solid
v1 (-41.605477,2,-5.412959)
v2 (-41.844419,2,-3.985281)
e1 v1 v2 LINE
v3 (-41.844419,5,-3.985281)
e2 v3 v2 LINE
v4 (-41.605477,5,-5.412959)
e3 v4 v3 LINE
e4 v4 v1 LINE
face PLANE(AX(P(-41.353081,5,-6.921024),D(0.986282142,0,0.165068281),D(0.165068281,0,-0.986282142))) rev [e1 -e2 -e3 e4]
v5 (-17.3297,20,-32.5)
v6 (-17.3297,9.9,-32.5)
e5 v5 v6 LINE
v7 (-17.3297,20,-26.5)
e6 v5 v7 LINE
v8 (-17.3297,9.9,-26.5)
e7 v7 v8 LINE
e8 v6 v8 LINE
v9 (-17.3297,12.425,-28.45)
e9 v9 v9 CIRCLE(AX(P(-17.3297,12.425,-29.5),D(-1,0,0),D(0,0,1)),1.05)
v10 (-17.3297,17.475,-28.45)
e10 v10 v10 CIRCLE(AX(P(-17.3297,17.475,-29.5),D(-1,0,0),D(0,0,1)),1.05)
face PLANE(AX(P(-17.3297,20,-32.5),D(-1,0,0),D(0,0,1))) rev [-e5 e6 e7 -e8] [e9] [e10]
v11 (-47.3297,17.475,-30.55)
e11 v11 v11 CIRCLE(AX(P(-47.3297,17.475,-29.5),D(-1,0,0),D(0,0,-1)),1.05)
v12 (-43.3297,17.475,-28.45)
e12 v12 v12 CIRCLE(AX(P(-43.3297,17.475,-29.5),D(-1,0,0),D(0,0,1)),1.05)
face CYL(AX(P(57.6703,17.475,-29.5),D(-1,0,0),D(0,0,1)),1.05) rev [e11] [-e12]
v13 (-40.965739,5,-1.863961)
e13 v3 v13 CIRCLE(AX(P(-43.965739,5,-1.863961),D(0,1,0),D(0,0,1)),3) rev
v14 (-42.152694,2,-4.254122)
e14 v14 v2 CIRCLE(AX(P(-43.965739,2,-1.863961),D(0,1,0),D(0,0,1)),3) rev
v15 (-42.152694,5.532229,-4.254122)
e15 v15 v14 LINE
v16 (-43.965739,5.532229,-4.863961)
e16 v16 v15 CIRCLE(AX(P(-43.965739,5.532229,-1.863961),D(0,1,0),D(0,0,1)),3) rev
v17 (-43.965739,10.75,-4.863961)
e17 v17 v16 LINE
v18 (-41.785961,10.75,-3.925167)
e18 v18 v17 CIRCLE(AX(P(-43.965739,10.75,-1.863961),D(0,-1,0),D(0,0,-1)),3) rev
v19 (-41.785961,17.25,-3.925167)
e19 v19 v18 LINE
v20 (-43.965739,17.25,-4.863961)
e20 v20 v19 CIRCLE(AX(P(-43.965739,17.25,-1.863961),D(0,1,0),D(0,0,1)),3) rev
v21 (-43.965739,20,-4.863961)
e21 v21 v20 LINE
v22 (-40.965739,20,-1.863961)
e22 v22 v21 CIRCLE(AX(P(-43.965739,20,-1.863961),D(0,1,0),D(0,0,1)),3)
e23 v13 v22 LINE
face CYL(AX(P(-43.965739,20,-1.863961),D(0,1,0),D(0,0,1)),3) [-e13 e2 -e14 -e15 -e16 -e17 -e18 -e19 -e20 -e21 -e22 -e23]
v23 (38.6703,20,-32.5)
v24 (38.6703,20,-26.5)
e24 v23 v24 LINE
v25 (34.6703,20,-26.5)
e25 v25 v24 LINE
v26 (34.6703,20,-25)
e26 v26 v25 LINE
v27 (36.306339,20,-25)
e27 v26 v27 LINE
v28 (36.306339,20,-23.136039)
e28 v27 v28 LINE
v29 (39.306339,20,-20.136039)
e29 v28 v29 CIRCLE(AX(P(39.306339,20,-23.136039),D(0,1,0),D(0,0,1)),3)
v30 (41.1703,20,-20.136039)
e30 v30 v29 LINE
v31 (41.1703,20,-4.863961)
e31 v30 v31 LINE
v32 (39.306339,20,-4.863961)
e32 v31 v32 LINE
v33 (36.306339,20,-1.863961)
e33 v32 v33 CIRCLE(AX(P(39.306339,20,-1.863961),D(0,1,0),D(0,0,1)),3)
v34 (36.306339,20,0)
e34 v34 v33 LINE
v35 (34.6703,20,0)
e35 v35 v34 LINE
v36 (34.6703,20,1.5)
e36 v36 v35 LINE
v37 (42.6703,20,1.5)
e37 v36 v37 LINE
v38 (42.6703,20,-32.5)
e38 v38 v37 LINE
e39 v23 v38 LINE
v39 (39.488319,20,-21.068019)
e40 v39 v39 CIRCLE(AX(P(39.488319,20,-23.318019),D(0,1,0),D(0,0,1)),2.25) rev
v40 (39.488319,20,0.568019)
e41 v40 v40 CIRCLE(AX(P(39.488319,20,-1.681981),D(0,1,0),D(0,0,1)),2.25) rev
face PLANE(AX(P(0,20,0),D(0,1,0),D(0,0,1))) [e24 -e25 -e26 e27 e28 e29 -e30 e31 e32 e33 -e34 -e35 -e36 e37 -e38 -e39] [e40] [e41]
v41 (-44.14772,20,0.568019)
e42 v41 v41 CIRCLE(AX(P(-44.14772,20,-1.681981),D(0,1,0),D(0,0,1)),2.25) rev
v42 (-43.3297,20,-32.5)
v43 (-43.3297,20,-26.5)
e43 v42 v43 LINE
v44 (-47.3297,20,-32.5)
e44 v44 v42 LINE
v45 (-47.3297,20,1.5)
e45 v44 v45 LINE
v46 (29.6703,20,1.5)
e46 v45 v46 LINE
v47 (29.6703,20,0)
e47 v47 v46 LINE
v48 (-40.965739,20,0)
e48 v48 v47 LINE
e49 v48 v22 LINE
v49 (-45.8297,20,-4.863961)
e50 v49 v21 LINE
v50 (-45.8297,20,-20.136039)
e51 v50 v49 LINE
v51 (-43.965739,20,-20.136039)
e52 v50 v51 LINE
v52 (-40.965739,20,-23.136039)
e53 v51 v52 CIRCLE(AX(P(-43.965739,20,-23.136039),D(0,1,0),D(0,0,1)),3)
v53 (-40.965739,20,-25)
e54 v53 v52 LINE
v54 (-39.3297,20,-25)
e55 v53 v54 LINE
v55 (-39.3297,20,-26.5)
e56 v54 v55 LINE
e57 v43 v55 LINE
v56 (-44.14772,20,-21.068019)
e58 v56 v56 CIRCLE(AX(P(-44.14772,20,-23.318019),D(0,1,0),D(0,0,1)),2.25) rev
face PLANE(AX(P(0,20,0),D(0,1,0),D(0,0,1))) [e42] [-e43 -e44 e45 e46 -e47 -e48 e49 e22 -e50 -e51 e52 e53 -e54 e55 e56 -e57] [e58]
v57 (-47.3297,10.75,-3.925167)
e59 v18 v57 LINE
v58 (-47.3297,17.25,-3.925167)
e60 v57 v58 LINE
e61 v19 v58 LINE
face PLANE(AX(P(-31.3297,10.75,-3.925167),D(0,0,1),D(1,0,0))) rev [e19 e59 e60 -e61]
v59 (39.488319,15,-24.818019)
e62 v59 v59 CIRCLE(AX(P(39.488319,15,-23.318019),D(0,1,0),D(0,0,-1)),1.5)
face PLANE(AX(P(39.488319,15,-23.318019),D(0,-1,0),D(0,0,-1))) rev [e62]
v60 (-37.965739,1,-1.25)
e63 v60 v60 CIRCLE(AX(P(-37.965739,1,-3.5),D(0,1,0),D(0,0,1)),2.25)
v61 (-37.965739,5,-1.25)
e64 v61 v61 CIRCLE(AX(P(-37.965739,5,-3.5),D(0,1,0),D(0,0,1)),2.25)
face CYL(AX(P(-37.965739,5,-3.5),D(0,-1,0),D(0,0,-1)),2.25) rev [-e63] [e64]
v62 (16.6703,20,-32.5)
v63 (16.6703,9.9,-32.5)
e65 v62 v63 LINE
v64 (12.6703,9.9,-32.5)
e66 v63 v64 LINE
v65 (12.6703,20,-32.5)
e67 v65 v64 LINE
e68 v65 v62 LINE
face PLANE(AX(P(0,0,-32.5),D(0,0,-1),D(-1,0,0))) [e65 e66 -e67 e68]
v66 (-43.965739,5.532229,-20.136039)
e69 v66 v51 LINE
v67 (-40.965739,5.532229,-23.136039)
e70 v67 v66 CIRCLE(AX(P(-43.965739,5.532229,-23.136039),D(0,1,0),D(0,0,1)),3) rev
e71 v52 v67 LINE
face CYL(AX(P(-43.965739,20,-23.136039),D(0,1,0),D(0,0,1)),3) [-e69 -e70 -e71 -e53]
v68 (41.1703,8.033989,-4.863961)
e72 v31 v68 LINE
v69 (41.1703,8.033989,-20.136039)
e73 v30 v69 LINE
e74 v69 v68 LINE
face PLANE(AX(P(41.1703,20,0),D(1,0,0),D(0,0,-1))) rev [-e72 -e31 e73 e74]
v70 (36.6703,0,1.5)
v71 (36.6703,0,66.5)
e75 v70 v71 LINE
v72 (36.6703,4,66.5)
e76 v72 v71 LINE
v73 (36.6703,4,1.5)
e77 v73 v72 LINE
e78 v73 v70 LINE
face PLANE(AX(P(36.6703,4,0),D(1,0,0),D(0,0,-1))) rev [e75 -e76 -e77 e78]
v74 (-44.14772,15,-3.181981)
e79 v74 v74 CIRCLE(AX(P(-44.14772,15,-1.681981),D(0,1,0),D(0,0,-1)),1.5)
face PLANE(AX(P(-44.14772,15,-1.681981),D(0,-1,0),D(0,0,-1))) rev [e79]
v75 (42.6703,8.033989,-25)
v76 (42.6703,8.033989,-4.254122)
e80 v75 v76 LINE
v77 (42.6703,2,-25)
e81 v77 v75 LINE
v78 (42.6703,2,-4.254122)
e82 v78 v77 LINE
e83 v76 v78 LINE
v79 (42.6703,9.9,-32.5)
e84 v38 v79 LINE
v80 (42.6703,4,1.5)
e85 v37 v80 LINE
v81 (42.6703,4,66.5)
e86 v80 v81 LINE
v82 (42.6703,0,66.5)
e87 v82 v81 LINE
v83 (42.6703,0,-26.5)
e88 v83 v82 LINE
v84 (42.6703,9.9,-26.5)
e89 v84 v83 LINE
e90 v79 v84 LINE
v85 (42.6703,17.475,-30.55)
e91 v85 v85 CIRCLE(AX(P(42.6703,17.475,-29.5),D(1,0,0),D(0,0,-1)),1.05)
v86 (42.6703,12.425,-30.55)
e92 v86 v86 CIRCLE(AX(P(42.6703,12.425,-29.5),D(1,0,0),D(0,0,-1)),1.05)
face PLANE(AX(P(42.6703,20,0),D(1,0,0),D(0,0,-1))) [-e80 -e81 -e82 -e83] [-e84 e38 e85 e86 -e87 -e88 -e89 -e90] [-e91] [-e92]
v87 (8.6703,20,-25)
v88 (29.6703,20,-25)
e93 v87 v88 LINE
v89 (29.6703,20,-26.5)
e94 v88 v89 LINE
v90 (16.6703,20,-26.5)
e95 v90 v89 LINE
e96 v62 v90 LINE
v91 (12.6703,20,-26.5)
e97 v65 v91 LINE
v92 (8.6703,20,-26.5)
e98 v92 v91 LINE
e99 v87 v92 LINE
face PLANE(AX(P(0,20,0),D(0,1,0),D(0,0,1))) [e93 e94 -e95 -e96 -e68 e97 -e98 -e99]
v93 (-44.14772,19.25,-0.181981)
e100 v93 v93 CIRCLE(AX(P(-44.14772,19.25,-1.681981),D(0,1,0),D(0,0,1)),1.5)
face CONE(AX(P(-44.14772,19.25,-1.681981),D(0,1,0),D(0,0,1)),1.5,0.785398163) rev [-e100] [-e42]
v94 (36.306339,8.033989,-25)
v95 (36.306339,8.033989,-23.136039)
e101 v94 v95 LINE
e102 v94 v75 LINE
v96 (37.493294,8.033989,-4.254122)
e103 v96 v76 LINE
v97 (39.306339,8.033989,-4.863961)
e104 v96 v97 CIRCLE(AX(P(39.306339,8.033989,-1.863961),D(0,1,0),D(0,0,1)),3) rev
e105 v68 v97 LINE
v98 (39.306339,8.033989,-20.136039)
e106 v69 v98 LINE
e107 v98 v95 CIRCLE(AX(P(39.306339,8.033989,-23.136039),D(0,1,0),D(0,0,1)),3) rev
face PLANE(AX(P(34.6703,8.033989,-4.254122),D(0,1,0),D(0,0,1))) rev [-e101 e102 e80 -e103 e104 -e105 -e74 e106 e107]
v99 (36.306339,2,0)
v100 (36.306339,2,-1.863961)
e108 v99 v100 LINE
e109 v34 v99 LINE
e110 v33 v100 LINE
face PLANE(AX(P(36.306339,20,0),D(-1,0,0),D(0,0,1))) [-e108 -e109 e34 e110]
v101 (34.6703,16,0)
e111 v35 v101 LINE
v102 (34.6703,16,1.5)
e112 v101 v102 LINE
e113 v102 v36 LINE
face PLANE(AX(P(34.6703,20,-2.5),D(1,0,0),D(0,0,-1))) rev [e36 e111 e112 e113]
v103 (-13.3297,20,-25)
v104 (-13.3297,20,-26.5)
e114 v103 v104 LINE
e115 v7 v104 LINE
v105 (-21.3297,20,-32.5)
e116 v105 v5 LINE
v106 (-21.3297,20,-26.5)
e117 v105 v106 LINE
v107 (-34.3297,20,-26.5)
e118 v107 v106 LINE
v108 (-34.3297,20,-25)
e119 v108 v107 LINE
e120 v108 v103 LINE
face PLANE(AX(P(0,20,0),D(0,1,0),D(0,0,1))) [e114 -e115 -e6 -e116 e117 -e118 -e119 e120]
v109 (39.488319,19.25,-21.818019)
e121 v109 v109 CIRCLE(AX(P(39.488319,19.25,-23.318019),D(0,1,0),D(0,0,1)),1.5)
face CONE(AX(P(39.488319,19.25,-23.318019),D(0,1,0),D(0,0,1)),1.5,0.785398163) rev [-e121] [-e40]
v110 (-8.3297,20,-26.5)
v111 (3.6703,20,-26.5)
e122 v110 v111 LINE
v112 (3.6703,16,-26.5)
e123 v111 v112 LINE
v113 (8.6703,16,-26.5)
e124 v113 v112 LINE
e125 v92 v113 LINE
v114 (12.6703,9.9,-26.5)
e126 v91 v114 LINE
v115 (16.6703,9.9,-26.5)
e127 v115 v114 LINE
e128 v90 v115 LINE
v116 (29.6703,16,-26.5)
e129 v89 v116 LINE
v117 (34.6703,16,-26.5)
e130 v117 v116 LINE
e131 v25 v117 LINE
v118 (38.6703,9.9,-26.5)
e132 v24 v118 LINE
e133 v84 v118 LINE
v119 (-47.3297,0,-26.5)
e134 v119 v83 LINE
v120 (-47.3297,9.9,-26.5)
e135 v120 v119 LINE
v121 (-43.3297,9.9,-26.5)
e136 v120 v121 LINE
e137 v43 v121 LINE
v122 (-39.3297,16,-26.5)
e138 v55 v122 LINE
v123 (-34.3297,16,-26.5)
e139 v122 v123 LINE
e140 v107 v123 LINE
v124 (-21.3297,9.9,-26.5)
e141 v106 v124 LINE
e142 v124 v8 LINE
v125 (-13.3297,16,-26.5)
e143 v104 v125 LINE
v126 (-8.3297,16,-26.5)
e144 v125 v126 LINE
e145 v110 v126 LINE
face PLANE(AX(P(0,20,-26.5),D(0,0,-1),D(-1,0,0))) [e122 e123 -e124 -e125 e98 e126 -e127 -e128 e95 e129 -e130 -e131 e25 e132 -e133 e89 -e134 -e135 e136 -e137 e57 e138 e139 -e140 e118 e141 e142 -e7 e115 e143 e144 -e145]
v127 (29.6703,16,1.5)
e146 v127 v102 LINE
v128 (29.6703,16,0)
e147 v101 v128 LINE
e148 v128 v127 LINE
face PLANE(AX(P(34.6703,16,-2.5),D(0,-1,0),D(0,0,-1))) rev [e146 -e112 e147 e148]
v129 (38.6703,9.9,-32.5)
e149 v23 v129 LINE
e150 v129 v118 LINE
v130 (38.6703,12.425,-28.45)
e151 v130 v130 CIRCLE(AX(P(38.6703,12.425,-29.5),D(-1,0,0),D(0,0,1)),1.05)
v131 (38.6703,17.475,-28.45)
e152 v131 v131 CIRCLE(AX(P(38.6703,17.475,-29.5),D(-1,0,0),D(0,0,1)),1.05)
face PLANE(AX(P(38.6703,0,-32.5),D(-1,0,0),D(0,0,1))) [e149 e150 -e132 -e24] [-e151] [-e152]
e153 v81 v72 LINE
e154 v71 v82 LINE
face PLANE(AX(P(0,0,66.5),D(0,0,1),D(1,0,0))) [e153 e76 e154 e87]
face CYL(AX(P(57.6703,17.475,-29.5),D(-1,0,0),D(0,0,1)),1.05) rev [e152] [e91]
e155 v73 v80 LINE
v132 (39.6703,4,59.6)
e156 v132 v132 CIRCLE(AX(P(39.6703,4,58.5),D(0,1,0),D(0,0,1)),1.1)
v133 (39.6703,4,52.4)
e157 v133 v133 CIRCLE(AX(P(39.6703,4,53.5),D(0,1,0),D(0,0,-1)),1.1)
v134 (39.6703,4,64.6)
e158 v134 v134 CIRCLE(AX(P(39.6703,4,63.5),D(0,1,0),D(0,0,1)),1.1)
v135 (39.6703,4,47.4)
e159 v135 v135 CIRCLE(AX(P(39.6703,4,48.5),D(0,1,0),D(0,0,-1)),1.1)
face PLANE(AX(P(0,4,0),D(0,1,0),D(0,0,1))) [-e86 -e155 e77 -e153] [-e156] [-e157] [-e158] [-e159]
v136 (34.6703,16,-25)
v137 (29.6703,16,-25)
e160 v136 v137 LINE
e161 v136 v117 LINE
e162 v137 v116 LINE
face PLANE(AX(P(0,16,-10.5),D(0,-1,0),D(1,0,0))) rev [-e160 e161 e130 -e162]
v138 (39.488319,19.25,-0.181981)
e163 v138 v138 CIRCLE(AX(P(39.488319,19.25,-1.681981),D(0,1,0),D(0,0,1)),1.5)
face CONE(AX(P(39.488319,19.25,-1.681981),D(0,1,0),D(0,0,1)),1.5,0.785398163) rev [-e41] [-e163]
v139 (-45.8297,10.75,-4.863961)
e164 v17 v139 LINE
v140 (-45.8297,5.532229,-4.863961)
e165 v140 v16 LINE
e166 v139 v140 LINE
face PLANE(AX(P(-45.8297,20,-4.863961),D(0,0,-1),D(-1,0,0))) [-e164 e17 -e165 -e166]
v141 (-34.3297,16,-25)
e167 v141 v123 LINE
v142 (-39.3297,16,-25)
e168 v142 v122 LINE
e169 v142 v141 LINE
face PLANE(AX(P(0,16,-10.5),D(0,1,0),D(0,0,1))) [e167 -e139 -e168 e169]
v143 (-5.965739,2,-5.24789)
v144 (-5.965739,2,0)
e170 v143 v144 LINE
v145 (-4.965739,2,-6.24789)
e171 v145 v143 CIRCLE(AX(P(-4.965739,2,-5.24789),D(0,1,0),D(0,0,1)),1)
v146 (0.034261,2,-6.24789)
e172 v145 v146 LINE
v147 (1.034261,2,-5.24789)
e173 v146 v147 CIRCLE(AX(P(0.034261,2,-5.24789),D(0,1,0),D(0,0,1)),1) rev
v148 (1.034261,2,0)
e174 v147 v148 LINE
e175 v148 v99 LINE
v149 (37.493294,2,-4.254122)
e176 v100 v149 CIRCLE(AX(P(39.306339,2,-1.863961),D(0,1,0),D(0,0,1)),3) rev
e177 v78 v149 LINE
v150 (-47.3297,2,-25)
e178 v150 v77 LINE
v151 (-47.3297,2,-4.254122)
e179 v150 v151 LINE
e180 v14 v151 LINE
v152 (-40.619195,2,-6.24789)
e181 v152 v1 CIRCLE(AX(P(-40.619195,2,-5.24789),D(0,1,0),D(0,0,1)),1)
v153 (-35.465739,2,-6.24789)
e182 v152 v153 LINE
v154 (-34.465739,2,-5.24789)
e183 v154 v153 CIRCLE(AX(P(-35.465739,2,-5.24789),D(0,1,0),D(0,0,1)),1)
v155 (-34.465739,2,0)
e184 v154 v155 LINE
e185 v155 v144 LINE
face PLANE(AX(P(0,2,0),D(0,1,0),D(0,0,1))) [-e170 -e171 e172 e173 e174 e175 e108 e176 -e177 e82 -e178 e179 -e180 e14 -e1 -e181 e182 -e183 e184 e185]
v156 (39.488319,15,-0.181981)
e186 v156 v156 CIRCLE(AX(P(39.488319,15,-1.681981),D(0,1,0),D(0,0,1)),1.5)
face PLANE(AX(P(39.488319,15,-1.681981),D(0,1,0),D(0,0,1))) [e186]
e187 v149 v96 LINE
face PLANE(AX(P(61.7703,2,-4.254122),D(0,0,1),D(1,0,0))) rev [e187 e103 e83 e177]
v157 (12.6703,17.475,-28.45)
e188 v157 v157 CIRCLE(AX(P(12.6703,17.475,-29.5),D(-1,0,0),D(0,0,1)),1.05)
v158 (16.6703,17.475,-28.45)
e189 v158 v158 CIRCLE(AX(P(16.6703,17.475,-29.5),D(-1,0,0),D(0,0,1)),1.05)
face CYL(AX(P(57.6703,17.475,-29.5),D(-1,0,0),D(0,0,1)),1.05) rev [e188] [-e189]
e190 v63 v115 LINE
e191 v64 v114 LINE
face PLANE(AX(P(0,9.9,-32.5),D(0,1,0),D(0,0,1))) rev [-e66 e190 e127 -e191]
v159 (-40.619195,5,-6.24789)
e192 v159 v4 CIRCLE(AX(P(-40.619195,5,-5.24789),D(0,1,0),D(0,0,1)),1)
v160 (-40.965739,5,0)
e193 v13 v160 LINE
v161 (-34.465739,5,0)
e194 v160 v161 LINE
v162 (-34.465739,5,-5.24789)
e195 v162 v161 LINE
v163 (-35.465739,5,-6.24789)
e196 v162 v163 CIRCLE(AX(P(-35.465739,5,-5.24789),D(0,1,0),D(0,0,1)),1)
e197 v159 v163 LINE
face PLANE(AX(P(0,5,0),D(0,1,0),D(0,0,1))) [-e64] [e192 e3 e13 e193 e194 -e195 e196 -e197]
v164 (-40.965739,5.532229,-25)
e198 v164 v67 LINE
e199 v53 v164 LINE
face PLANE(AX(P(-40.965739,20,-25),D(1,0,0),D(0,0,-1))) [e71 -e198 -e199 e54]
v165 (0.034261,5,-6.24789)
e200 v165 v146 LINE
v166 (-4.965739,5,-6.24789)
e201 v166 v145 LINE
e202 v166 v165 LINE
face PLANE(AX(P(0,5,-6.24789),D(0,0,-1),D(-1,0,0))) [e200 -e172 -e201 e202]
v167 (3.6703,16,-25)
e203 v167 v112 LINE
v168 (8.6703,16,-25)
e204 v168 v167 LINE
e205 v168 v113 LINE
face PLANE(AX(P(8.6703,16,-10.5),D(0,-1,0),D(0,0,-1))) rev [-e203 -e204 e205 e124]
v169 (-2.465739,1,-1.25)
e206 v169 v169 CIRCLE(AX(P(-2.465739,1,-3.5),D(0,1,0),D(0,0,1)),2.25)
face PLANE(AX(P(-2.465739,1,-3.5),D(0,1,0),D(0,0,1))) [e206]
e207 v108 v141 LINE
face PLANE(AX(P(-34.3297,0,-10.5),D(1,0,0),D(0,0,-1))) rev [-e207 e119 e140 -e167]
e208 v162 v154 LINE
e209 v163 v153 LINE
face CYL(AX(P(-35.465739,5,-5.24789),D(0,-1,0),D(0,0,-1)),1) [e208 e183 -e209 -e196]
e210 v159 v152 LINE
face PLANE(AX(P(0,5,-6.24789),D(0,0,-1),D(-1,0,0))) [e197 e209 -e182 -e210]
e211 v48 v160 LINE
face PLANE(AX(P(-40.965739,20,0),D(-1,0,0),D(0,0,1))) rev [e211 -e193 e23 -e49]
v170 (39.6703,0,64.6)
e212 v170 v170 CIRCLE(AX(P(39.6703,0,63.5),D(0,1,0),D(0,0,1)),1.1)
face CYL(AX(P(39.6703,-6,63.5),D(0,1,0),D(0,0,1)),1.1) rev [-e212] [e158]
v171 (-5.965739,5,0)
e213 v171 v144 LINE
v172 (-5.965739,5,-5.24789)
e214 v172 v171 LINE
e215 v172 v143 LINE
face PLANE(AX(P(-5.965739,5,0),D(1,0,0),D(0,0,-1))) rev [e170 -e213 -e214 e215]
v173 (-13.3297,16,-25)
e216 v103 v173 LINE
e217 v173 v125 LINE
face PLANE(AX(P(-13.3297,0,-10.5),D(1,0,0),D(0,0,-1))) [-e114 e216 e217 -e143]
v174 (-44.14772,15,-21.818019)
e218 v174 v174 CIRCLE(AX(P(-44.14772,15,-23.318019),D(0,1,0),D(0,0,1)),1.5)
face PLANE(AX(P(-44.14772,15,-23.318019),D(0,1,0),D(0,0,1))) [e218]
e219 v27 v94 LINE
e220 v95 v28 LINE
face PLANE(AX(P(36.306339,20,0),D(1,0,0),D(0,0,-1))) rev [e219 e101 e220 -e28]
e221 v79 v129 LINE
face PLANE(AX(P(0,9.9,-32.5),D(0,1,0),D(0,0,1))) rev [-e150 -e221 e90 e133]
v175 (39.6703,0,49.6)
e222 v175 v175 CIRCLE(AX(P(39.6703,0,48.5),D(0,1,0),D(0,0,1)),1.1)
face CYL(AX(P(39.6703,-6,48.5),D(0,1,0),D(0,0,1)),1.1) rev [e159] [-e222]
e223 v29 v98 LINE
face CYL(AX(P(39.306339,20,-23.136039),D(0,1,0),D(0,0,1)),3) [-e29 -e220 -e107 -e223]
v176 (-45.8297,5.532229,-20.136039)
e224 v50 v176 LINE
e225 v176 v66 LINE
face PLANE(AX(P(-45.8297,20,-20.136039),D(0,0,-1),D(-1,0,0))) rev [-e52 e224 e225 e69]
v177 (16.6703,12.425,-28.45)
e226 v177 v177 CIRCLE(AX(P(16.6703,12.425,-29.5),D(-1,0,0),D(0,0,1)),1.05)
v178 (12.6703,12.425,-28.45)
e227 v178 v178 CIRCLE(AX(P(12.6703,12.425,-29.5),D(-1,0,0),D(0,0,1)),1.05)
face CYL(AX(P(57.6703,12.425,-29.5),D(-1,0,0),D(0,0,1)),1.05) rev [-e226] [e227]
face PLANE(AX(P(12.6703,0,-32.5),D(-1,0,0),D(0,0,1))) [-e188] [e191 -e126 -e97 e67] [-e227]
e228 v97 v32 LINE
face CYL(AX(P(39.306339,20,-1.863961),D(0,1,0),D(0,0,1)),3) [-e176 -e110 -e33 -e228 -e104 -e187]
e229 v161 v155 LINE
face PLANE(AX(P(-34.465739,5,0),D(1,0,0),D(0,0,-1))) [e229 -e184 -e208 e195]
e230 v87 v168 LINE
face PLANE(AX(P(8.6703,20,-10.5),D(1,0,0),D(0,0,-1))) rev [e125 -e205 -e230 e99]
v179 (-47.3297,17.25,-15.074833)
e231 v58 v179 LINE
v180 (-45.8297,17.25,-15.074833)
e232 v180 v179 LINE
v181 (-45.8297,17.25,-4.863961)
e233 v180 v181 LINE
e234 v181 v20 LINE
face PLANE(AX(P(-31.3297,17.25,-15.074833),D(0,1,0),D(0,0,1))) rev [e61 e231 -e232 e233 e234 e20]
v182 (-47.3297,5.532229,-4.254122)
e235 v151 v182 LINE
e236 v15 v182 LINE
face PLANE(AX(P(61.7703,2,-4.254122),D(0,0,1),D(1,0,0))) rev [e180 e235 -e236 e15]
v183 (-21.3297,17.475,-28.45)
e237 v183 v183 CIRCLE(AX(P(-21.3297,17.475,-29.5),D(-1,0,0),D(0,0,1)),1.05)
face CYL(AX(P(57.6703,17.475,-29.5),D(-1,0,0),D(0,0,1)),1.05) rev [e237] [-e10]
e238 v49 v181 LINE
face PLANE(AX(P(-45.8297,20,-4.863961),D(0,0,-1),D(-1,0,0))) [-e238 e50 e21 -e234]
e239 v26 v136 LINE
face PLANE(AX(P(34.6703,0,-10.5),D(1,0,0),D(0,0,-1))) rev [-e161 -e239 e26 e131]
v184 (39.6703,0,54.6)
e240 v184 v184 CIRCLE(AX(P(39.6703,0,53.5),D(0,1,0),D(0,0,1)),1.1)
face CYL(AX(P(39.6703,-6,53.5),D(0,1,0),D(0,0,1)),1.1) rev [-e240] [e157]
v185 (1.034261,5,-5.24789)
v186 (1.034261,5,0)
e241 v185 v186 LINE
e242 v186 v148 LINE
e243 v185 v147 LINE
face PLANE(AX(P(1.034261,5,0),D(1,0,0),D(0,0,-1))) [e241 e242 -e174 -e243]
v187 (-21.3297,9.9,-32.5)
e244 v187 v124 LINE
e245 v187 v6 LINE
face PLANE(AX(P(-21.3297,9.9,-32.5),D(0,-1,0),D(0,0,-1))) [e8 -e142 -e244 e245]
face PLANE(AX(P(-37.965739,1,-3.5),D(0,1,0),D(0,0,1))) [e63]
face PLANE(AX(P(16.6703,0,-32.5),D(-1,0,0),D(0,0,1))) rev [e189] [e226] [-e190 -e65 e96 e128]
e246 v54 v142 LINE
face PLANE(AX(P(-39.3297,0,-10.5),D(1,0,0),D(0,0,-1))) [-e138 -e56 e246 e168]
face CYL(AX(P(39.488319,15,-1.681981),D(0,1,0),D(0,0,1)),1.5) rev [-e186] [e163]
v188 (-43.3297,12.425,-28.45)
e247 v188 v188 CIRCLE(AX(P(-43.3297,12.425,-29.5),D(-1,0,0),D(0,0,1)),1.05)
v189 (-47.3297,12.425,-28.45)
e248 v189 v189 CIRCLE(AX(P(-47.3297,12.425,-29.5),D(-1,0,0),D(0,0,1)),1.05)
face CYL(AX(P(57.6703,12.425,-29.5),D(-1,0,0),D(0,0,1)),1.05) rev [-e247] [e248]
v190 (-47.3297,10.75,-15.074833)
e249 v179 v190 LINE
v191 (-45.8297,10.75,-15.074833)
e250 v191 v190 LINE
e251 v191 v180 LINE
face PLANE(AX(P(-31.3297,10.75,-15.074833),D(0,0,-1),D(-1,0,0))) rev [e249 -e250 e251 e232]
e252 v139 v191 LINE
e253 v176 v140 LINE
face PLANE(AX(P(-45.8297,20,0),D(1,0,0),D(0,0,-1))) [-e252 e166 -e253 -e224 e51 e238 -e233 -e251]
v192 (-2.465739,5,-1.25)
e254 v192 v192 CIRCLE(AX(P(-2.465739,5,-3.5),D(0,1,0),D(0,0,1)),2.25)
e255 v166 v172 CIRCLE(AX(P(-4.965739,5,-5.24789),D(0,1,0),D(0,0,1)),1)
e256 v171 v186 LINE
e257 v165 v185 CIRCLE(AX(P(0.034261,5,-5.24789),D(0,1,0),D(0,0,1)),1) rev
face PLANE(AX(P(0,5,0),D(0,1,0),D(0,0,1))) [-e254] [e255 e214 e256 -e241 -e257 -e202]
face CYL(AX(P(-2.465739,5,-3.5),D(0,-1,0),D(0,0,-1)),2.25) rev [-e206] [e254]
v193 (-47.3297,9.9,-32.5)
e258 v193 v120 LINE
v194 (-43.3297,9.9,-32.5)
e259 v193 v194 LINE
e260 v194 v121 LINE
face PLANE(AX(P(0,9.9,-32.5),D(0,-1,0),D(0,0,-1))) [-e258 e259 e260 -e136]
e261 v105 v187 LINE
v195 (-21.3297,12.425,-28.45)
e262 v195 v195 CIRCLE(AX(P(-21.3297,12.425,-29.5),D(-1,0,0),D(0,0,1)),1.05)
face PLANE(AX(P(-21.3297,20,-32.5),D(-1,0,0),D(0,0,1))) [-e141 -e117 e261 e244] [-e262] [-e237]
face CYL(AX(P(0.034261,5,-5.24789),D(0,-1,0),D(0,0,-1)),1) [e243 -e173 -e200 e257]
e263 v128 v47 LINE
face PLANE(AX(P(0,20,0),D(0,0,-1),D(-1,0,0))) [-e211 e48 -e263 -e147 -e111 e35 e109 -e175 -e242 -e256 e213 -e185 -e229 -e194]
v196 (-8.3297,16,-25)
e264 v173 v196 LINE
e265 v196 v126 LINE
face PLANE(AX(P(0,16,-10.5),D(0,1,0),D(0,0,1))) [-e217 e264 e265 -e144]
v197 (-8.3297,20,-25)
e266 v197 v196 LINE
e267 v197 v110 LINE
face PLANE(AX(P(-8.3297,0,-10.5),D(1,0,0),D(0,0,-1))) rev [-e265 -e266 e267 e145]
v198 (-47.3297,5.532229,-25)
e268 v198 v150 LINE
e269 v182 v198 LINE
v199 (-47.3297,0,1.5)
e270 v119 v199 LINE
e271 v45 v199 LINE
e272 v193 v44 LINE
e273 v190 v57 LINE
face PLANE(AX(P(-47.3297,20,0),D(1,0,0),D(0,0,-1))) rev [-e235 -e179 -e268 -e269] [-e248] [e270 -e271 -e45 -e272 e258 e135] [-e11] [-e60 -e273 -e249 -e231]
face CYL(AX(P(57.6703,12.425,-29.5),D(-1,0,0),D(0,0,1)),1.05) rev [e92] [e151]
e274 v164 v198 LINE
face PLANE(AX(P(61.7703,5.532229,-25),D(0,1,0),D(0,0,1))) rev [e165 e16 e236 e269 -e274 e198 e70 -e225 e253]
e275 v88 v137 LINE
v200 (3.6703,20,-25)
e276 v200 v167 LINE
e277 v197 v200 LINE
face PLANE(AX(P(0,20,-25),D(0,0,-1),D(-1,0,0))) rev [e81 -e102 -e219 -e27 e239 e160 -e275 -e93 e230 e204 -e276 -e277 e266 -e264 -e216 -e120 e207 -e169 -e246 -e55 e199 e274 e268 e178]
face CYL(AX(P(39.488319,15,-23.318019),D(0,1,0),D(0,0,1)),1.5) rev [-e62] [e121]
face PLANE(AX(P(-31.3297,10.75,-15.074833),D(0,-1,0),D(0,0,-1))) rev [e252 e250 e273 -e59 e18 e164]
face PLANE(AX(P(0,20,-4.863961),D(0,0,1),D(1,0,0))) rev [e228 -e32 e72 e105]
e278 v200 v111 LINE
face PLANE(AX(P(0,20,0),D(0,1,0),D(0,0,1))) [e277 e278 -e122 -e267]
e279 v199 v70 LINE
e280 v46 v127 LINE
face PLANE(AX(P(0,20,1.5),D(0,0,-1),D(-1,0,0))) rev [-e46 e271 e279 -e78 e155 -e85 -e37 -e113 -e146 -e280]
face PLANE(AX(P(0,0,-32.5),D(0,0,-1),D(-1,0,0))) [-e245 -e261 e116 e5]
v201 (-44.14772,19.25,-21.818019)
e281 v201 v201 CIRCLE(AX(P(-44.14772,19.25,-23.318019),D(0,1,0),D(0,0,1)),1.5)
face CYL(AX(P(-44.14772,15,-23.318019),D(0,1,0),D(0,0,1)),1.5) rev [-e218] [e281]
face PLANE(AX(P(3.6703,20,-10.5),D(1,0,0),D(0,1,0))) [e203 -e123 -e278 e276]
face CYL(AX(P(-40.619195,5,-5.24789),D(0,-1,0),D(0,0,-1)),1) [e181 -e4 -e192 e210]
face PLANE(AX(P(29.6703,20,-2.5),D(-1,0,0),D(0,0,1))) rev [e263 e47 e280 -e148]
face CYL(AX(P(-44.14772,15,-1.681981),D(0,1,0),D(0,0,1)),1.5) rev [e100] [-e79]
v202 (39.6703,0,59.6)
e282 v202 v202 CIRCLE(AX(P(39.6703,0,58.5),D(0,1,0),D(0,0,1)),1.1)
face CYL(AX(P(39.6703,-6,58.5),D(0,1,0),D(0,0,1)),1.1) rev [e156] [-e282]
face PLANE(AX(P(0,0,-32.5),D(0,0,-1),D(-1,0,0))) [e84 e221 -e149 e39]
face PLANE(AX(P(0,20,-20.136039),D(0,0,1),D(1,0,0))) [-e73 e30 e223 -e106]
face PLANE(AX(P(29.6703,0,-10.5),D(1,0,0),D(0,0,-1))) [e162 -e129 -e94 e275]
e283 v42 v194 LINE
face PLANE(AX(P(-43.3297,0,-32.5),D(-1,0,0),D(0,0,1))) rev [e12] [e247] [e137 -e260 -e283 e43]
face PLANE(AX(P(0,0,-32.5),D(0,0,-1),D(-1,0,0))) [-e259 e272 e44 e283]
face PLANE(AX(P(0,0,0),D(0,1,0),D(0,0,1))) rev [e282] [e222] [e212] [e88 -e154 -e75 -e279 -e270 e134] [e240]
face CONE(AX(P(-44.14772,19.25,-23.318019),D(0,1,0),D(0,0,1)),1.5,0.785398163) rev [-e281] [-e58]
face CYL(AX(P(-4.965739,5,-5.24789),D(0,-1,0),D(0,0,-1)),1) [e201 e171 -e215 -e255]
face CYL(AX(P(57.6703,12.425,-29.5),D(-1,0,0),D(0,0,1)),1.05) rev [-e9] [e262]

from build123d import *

# Parameters (mm, degrees)
SKETCH2_W           = 87
SKETCH2_H           = 25
BOSS_EXTRUDE1_DEPTH = 2
SKETCH2_3_W         = 90
SKETCH2_3_H         = 28
SKETCH2_3_W_2       = 87
SKETCH2_3_H_2       = 25
BOSS_EXTRUDE2_DEPTH = 20
SKETCH3_W           = 4
SKETCH3_H           = 10.1
BOSS_EXTRUDE3_DEPTH = 6
SKETCH5_R           = 1.05
CUT_EXTRUDE2_DEPTH  = 105
SKETCH3_5_W         = 5
SKETCH3_5_H         = 4
CUT_EXTRUDE3_DEPTH  = 16
SKETCH2_4_W         = 6
SKETCH2_4_H         = 55
BOSS_EXTRUDE4_DEPTH = 4
SKETCH8_W           = 4.863961031
SKETCH8_H           = 4.863961031
SKETCH8_W_2         = 4.86396103
BOSS_EXTRUDE5_DEPTH = 18
SKETCH9_R           = 1.5
CUT_EXTRUDE6_DEPTH  = 5
SKETCH6_W           = 11.14966652
SKETCH6_H           = 6.5
CUT_EXTRUDE4_DEPTH  = 16
FILLET1_R           = 3
SKETCH10_W          = 20.745878282
SKETCH10_H          = 3.532229036
CUT_EXTRUDE7_DEPTH  = 109.1
SKETCH11_W          = 5
SKETCH11_H          = 4
CUT_EXTRUDE8_DEPTH  = 4
SKETCH12_W          = 20.745878282
SKETCH12_H          = 2.501759487
CUT_EXTRUDE10_DEPTH = 8
SKETCH13_R          = 2.25
BOSS_EXTRUDE6_DEPTH = 3
CHAMFER1_SIZE       = 0.75
SKETCH17_W          = 6
SKETCH17_H          = 4
BOSS_EXTRUDE9_DEPTH = 10
SKETCH7_R           = 1.1
CUT_EXTRUDE5_DEPTH  = 10
CUT_EXTRUDE11_START = -1
SKETCH18_R          = 2.25
CUT_EXTRUDE11_DEPTH = 1


with BuildPart() as part:
    # Sketch2 → Boss-Extrude1 (new body)
    with BuildSketch(Plane(origin=(0, 0, 0), x_dir=(1, 0, 0), z_dir=(0, 1, 0))):
        with Locations((-2.329700272, 12.5)):
            Rectangle(SKETCH2_W, SKETCH2_H)
    extrude(amount=BOSS_EXTRUDE1_DEPTH)

    # Sketch2<3> → Boss-Extrude2 (add)
    with BuildSketch(Plane(origin=(0, 0, 0), x_dir=(1, 0, 0), z_dir=(0, 1, 0))):
        with Locations((-2.329700272, 12.5)):
            Rectangle(SKETCH2_3_W, SKETCH2_3_H)
        with Locations((-2.329700272, 12.5)):
            Rectangle(SKETCH2_3_W_2, SKETCH2_3_H_2, mode=Mode.SUBTRACT)
    extrude(amount=BOSS_EXTRUDE2_DEPTH)

    # Sketch3 → Boss-Extrude3 (add)
    with BuildSketch(Plane(origin=(0, 0, -26.5), x_dir=(-1, 0, 0), z_dir=(0, 0, -1))):
        with Locations((45.329700272, 14.95)):
            Rectangle(SKETCH3_W, SKETCH3_H)
        with Locations((-14.670299728, 14.95)):
            Rectangle(SKETCH3_W, SKETCH3_H)
        with Locations((-40.670299728, 14.95)):
            Rectangle(SKETCH3_W, SKETCH3_H)
        with Locations((19.329700272, 14.95)):
            Rectangle(SKETCH3_W, SKETCH3_H)
    extrude(amount=BOSS_EXTRUDE3_DEPTH)

    # Sketch5 → Cut-Extrude2 (cut)
    with BuildSketch(Plane.ZY.offset(47.329700272)):
        with Locations((-29.5, 12.425)):
            Circle(SKETCH5_R)
        with Locations((-29.5, 17.475)):
            Circle(SKETCH5_R)
    extrude(amount=-CUT_EXTRUDE2_DEPTH, mode=Mode.SUBTRACT)

    # Sketch3<5> → Cut-Extrude3 (cut)
    with BuildSketch(Plane(origin=(0, 0, -26.5), x_dir=(-1, 0, 0), z_dir=(0, 0, -1))):
        with Locations((36.829700272, 18)):
            Rectangle(SKETCH3_5_W, SKETCH3_5_H)
        with Locations((10.829700272, 18)):
            Rectangle(SKETCH3_5_W, SKETCH3_5_H)
        with Locations((-32.170299728, 18)):
            Rectangle(SKETCH3_5_W, SKETCH3_5_H)
        with Locations((-6.170299728, 18)):
            Rectangle(SKETCH3_5_W, SKETCH3_5_H)
    extrude(amount=-CUT_EXTRUDE3_DEPTH, mode=Mode.SUBTRACT)

    # Sketch2<4> → Boss-Extrude4 (add)
    with BuildSketch(Plane(origin=(0, 0, 0), x_dir=(1, 0, 0), z_dir=(0, 1, 0))):
        with Locations((39.670299728, -29)):
            Rectangle(SKETCH2_4_W, SKETCH2_4_H)
    extrude(amount=BOSS_EXTRUDE4_DEPTH)

    # Sketch8 → Boss-Extrude5 (add)
    with BuildSketch(Plane(origin=(0, 2, 0), x_dir=(1, 0, 0), z_dir=(0, 1, 0))):
        with Locations((38.738319213, 22.568019484)):
            Rectangle(SKETCH8_W, SKETCH8_H)
        with Locations((38.738319213, 2.431980516)):
            Rectangle(SKETCH8_W, SKETCH8_H)
        with Locations((-43.397719757, 22.568019484)):
            Rectangle(SKETCH8_W_2, SKETCH8_H)
        with Locations((-43.397719757, 2.431980516)):
            Rectangle(SKETCH8_W_2, SKETCH8_H)
    extrude(amount=BOSS_EXTRUDE5_DEPTH)

    # Sketch9 → Cut-Extrude6 (cut)
    with BuildSketch(Plane(origin=(0, 20, 0), x_dir=(1, 0, 0), z_dir=(0, 1, 0))):
        with Locations(Location((-44.147719757, 23.318019485, 0), (0, 0, 270))):
            Circle(SKETCH9_R)
        with Locations(Location((-44.147719757, 1.681980515, 0), (0, 0, 90))):
            Circle(SKETCH9_R)
        with Locations(Location((39.488319212, 1.681980515, 0), (0, 0, 270))):
            Circle(SKETCH9_R)
        with Locations(Location((39.488319212, 23.318019485, 0), (0, 0, 90))):
            Circle(SKETCH9_R)
    extrude(amount=-CUT_EXTRUDE6_DEPTH, mode=Mode.SUBTRACT)

    # Sketch6 → Cut-Extrude4 (cut)
    with BuildSketch(Plane.ZY.offset(47.329700272)):
        with Locations((-9.5, 14)):
            Rectangle(SKETCH6_W, SKETCH6_H)
    extrude(amount=-CUT_EXTRUDE4_DEPTH, mode=Mode.SUBTRACT)

    # Fillet1
    # the kernel refuses this fillet: 3 mm, written as the material it takes off along each edge
    with BuildSketch(Plane(origin=(36.306338697, 2, -4.863961031), x_dir=(0, 0, 1), z_dir=(0, 1, 0)), Plane(origin=(-40.965739242, 2, -20.136038969), x_dir=(0, 0, -1), z_dir=(0, 1, 0))) as fillet1_piece_1:
        with BuildLine():
            CenterArc((FILLET1_R, FILLET1_R), FILLET1_R, 180, 90)
            Line((0, FILLET1_R), (0, 0))
            Line((0, 0), (FILLET1_R, 0))
        make_face()
    extrude(amount=25.5, mode=Mode.SUBTRACT)
    with BuildSketch(Plane(origin=(36.306338697, 2, -20.136038969), x_dir=(0, 0, -1), z_dir=(0, 1, 0))) as fillet1_piece_2:
        with BuildLine():
            CenterArc((FILLET1_R, -FILLET1_R), FILLET1_R, 90, 90)
            Line((0, -FILLET1_R), (0, 0))
            Line((0, 0), (FILLET1_R, 0))
        make_face()
    extrude(amount=25.5, mode=Mode.SUBTRACT)
    with BuildSketch(Plane(origin=(-40.965739242, 2, -4.863961031), x_dir=(0, 0, 1), z_dir=(0, 1, 0))) as fillet1_piece_3:
        with BuildLine():
            CenterArc((FILLET1_R, -FILLET1_R), FILLET1_R, 90, 90)
            Line((0, -FILLET1_R), (0, 0))
            Line((0, 0), (FILLET1_R, 0))
        make_face()
    extrude(amount=16.25, mode=Mode.SUBTRACT)
    with BuildSketch(Plane(origin=(-40.965739242, 9.75, -4.863961031), x_dir=(-1, 0, 0), z_dir=(0, 1, 0))) as fillet1_piece_4:
        with BuildLine():
            CenterArc((FILLET1_R, FILLET1_R), FILLET1_R, 180, 90)
            Line((0, FILLET1_R), (0, 0))
            Line((0, 0), (FILLET1_R, 0))
        make_face()
    extrude(amount=17.75, mode=Mode.SUBTRACT)

    # Sketch10 → Cut-Extrude7 (cut)
    with BuildSketch(Plane.ZY.offset(47.329700272)):
        with Locations((-14.627060859, 3.766114518)):
            Rectangle(SKETCH10_W, SKETCH10_H)
    extrude(amount=-CUT_EXTRUDE7_DEPTH, mode=Mode.SUBTRACT)

    # Sketch11 → Cut-Extrude8 (cut)
    with BuildSketch(Plane.XY.offset(1.5)):
        with Locations((32.170299728, 18)):
            Rectangle(SKETCH11_W, SKETCH11_H)
    extrude(amount=-CUT_EXTRUDE8_DEPTH, mode=Mode.SUBTRACT)

    # Sketch12 → Cut-Extrude10 (cut)
    with BuildSketch(Plane(origin=(42.670299728, 0, 0), x_dir=(0, 0, -1), z_dir=(1, 0, 0))):
        with Locations((14.627060859, 6.78310878)):
            Rectangle(SKETCH12_W, SKETCH12_H)
    extrude(amount=-CUT_EXTRUDE10_DEPTH, mode=Mode.SUBTRACT)

    # Sketch13 → Boss-Extrude6 (add)
    # profile 1 of 2: a face of its own
    with BuildSketch(Plane(origin=(0, 2, 0), x_dir=(1, 0, 0), z_dir=(0, 1, 0))):
        with BuildLine():
            Line((-40.965739242, 1.863961031), (-40.965739242, 0))
            Line((-40.965739242, 0), (-34.465739242, 0))
            Line((-34.465739242, 0), (-34.465739242, 5.247890406))
            ThreePointArc((-34.465739242, 5.247890406), (-34.758632461, 5.954997187), (-35.465739242, 6.247890406))
            Line((-35.465739242, 6.247890406), (-40.619194745, 6.247890406))
            ThreePointArc((-40.619194745, 6.247890406), (-41.102765854, 6.123195485), (-41.465739242, 5.78020837))
            ThreePointArc((-41.465739242, 5.78020837), (-41.553823791, 5.60351457), (-41.605476886, 5.412958687))
            Line((-41.605476886, 5.412958687), (-41.844418898, 3.985281374))
            ThreePointArc((-41.844418898, 3.985281374), (-41.194100644, 3.012011328), (-40.965739242, 1.863961031))
        make_face()
        with Locations(Location((-37.965739242, 3.5, 0), (0, 0, 270))):
            Circle(SKETCH13_R, mode=Mode.SUBTRACT)
    # profile 2 of 2: a face of its own
    with BuildSketch(Plane(origin=(0, 2, 0), x_dir=(1, 0, 0), z_dir=(0, 1, 0))):
        with BuildLine():
            Line((-5.965739242, 0), (1.034260758, 0))
            Line((1.034260758, 0), (1.034260758, 5.247890406))
            ThreePointArc((1.034260758, 5.247890406), (0.741367539, 5.954997187), (0.034260758, 6.247890406))
            Line((0.034260758, 6.247890406), (-4.965739242, 6.247890406))
            ThreePointArc((-4.965739242, 6.247890406), (-5.672846023, 5.954997187), (-5.965739242, 5.247890406))
            Line((-5.965739242, 5.247890406), (-5.965739242, 0))
        make_face()
        with Locations(Location((-2.465739242, 3.5, 0), (0, 0, 270))):
            Circle(SKETCH13_R, mode=Mode.SUBTRACT)
    extrude(amount=BOSS_EXTRUDE6_DEPTH)

    # Chamfer1
    chamfer1_edges = [part.edges().sort_by_distance(p)[0] for p in [
        (39.488319212, 20, -21.818019485),
        (39.488319212, 20, -3.181980515),
        (-44.147719757, 20, -0.181980515),
        (-44.147719757, 20, -24.818019485),
    ]]
    chamfer(chamfer1_edges, length=CHAMFER1_SIZE)

    # Sketch17 → Boss-Extrude9 (add)
    with BuildSketch(Plane.XY.offset(56.5)):
        with Locations((39.670299728, 2)):
            Rectangle(SKETCH17_W, SKETCH17_H)
    extrude(amount=BOSS_EXTRUDE9_DEPTH)

    # Sketch7 → Cut-Extrude5 (cut)
    with BuildSketch(Plane(origin=(0, 4, 0), x_dir=(1, 0, 0), z_dir=(0, 1, 0))):
        with Locations(Location((39.670299728, -63.5, 0), (0, 0, 270))):
            Circle(SKETCH7_R)
        with Locations(Location((39.670299728, -58.5, 0), (0, 0, 270))):
            Circle(SKETCH7_R)
        with Locations(Location((39.670299728, -48.5, 0), (0, 0, 270))):
            Circle(SKETCH7_R)
        with Locations(Location((39.670299728, -53.5, 0), (0, 0, 270))):
            Circle(SKETCH7_R)
    extrude(amount=-CUT_EXTRUDE5_DEPTH, mode=Mode.SUBTRACT)

    # Sketch18 → Cut-Extrude11 (cut)
    with BuildSketch(Plane(origin=(0, 2, 0), x_dir=(1, 0, 0), z_dir=(0, 1, 0)).offset(CUT_EXTRUDE11_START)):
        with Locations(Location((-37.965739242, 3.5, 0), (0, 0, 270))):
            Circle(SKETCH18_R)
        with Locations(Location((-2.465739242, 3.5, 0), (0, 0, 270))):
            Circle(SKETCH18_R)
    extrude(amount=CUT_EXTRUDE11_DEPTH, mode=Mode.SUBTRACT)


solid = part.part
